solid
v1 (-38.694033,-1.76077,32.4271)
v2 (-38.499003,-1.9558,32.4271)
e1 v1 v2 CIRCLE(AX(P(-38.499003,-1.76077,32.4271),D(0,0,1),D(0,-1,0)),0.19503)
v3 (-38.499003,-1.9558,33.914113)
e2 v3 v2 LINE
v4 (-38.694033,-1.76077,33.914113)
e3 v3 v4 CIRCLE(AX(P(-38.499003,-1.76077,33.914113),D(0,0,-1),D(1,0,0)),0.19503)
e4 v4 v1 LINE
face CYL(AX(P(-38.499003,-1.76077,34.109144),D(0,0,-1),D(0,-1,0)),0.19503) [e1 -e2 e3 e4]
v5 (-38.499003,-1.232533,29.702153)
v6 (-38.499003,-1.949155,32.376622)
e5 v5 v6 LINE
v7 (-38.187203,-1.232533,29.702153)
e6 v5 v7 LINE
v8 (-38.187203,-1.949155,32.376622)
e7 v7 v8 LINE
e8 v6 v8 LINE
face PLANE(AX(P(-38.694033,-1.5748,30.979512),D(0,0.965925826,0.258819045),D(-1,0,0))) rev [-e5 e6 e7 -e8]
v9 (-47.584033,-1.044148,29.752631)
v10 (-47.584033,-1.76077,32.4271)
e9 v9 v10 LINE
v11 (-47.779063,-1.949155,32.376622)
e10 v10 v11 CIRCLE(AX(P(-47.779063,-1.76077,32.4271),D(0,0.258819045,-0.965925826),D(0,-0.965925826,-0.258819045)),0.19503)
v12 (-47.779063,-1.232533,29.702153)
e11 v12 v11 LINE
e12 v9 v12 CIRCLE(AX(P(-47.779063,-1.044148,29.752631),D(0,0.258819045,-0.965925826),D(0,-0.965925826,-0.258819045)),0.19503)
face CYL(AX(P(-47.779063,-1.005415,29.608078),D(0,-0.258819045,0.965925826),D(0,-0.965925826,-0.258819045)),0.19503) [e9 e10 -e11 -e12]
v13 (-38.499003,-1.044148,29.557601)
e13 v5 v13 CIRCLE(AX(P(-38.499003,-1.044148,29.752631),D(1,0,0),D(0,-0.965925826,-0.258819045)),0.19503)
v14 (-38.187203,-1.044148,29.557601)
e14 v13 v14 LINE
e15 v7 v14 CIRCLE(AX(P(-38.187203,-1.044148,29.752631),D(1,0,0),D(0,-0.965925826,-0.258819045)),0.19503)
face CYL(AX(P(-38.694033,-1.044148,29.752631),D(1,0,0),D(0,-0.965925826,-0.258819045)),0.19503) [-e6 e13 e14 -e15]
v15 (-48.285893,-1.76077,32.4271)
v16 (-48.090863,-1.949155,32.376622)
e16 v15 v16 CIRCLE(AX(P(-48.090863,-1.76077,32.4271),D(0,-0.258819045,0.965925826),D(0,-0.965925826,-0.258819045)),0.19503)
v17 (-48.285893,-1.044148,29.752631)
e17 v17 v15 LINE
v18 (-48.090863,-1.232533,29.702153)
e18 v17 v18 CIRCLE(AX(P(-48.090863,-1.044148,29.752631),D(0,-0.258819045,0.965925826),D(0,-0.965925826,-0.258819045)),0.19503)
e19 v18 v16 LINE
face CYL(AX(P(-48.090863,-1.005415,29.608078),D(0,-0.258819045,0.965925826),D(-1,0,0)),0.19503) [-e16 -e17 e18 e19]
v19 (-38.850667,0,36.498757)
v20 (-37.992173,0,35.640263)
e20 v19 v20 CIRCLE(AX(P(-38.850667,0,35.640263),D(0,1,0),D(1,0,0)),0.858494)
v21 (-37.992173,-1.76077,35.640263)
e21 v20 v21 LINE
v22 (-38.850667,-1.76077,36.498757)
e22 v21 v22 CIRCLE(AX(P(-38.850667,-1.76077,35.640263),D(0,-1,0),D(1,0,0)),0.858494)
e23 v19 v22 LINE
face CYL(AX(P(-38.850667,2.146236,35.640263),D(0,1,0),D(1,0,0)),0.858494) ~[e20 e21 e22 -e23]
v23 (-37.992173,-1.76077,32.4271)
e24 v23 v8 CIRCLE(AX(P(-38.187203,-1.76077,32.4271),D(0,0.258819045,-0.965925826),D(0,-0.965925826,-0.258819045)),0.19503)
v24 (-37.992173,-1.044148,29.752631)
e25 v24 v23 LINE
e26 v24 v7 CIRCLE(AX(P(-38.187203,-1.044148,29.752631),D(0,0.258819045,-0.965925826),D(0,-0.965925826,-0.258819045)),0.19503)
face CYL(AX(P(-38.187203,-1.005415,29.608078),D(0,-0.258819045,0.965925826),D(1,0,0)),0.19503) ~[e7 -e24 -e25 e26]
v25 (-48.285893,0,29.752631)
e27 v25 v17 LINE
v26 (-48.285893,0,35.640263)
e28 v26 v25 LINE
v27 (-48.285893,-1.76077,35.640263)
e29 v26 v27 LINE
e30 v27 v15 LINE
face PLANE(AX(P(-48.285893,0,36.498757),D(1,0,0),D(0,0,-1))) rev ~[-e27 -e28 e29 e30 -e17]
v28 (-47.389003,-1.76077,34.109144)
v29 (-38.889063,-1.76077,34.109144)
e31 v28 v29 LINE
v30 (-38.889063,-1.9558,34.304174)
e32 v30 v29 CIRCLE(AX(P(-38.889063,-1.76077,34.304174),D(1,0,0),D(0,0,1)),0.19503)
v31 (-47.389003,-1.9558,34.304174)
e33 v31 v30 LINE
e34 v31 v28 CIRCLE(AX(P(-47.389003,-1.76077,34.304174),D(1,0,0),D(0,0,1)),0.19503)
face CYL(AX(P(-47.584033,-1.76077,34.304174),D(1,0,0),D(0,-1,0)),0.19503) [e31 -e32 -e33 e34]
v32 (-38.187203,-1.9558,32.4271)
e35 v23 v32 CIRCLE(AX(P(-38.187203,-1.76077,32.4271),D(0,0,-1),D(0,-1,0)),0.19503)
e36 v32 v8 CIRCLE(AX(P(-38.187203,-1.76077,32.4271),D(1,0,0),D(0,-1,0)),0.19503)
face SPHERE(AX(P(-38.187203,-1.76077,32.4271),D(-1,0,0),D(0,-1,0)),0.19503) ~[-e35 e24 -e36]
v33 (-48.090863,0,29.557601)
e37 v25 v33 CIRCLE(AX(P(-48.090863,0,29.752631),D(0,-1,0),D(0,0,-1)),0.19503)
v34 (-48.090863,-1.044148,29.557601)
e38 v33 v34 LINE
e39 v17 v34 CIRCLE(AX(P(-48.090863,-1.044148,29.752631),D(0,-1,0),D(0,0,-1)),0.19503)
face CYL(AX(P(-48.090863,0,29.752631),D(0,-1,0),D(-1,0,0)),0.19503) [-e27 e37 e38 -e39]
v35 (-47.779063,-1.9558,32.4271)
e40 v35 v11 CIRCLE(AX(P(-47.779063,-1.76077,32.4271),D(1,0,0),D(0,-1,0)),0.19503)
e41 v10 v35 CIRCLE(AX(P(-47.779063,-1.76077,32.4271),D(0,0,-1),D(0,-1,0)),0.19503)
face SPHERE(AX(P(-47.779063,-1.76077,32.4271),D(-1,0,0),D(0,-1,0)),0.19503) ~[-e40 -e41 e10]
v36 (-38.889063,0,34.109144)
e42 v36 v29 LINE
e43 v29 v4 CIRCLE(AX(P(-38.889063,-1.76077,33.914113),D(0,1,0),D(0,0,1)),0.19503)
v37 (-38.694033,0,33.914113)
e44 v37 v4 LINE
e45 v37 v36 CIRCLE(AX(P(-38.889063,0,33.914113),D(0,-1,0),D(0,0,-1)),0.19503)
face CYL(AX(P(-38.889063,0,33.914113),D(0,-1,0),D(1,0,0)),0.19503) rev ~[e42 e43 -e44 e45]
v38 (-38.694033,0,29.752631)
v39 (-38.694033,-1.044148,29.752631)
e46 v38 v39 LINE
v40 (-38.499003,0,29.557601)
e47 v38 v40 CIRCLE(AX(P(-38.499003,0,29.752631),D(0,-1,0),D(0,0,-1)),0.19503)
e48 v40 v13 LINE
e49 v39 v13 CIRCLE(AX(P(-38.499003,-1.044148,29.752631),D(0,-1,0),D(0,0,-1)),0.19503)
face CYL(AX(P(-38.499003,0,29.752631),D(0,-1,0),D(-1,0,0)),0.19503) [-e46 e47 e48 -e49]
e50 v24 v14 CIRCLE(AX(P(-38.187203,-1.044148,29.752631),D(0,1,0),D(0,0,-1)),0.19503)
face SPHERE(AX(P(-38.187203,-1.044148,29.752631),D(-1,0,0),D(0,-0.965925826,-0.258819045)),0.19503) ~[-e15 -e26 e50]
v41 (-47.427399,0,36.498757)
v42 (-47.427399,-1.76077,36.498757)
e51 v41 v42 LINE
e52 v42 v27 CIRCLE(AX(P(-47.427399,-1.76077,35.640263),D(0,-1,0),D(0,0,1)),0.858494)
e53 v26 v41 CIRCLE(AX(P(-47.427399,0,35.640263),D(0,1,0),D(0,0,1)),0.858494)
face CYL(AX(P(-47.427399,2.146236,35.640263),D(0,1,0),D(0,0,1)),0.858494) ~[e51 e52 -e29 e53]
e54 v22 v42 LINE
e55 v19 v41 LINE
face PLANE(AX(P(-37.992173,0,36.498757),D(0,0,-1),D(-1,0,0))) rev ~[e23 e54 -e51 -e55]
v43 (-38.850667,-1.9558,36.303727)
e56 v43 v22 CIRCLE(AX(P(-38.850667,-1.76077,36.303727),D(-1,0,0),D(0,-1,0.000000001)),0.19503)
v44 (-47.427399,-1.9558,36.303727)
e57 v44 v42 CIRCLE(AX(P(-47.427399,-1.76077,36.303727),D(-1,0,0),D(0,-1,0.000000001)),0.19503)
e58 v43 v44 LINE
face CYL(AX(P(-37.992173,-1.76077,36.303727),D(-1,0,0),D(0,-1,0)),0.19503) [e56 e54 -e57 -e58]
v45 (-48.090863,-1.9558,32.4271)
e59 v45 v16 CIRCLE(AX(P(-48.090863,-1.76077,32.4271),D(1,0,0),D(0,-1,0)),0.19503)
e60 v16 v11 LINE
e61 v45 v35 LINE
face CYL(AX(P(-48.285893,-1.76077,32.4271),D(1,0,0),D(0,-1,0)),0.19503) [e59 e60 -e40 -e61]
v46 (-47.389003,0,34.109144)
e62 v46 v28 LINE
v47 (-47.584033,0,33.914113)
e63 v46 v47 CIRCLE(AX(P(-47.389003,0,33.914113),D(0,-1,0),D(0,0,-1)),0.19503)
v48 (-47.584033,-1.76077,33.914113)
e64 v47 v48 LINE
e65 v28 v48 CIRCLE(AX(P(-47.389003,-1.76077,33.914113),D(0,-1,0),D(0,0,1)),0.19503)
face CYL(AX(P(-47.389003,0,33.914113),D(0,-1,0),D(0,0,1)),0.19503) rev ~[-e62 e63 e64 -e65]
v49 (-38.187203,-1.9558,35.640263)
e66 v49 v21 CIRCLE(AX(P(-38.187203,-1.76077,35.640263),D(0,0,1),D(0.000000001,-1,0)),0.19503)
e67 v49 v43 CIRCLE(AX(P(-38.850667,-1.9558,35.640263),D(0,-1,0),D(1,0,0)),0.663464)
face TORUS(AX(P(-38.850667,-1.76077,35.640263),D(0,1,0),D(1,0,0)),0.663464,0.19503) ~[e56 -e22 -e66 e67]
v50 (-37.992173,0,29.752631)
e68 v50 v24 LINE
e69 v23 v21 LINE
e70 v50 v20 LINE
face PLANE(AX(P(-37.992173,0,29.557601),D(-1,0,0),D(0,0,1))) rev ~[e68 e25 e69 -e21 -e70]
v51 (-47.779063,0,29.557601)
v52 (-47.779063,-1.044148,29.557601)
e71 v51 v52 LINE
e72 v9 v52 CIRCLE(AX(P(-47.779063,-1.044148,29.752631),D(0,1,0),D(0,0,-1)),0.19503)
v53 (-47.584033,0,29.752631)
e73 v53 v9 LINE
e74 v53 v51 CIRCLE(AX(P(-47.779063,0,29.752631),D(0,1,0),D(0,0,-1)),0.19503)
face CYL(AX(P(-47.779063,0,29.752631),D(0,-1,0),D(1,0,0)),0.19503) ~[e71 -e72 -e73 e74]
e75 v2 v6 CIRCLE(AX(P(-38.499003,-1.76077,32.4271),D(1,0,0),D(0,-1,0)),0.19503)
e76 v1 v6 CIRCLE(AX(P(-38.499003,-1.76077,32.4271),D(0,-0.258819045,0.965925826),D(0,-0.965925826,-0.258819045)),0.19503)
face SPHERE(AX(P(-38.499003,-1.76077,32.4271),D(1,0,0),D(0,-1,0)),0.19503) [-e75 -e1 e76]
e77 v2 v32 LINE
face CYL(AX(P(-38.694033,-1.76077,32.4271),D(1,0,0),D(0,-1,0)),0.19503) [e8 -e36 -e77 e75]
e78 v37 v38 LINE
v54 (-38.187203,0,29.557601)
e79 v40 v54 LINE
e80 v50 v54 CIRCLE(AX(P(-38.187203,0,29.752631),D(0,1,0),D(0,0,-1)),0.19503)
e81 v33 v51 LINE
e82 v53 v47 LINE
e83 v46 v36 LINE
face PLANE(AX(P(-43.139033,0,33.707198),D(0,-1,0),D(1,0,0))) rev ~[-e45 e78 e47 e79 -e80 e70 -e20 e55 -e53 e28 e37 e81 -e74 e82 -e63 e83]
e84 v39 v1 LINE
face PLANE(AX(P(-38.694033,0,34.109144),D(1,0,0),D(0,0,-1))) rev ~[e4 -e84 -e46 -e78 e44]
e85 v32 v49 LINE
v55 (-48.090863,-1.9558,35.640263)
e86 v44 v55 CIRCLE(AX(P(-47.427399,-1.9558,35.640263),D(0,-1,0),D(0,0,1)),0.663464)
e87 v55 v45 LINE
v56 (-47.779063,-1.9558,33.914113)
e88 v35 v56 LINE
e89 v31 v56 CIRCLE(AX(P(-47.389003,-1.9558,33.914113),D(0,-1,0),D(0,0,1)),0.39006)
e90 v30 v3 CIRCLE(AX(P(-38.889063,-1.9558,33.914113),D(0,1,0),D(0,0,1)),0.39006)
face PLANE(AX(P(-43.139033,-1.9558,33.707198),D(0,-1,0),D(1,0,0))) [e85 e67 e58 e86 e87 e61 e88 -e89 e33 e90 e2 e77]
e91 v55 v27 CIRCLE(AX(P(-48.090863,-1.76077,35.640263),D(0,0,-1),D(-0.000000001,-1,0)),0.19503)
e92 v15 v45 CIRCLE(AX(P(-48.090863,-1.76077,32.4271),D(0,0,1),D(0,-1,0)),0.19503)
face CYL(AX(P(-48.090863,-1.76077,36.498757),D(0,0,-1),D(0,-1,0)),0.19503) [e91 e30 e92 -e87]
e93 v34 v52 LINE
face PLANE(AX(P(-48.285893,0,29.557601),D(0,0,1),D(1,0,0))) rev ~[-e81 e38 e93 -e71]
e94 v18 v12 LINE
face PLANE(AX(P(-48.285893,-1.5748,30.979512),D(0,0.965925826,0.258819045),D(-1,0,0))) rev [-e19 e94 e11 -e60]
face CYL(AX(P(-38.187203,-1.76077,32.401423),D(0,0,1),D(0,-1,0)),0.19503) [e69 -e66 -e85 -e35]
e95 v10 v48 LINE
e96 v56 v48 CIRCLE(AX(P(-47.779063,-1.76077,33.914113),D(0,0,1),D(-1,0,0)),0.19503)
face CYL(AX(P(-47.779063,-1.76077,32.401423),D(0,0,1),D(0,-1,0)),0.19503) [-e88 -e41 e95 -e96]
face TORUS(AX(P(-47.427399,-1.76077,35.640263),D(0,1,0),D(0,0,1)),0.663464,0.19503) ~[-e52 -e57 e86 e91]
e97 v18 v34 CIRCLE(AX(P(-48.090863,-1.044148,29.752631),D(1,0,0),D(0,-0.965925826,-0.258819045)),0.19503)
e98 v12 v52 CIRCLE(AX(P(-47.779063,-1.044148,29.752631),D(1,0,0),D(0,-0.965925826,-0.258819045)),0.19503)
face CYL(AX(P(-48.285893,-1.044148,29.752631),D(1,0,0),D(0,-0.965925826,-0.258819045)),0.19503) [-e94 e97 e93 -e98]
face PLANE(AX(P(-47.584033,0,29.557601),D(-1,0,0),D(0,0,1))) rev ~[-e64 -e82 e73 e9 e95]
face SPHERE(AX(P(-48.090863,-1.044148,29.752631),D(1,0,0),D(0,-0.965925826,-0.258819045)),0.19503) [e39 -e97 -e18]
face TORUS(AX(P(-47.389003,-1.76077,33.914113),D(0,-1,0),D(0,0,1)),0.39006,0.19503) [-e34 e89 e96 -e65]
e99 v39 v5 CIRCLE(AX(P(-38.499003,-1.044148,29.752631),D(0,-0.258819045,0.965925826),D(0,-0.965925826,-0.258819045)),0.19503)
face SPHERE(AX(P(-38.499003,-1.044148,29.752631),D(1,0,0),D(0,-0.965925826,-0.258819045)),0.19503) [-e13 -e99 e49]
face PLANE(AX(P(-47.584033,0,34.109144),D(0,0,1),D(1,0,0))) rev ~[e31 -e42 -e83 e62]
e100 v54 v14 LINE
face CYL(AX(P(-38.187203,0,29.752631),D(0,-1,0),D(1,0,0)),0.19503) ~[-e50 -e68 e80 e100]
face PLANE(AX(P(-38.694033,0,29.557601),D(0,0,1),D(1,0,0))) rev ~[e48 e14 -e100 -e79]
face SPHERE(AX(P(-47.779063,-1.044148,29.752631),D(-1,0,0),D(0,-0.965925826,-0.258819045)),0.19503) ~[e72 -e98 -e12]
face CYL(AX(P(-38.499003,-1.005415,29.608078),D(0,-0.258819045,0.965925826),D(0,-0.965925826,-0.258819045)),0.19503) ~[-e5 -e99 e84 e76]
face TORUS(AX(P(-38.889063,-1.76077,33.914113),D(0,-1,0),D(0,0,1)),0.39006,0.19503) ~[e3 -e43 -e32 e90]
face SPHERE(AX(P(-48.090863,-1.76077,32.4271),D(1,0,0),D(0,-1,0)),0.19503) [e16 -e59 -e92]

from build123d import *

# Parameters (mm, degrees)
F1_DEPTH    = 1.9558
F2_SIZE2    = 2.8438227154
F2_SIZE     = 0.762
F2_2_SIZE2  = 2.8438227154
F2_2_SIZE   = 0.762
F3_R        = 0.1950302499
F4_T1_DEPTH = 4.1020358569
F4_T4_ANGLE = 90
F4_T6_ANGLE = 90


# Not quite as in the source:
# - a fillet or chamfer that OpenCascade refuses, or shapes differently, is made with other operations: its cross-section is extruded or revolved along the edge and cut away or added


with BuildPart() as f1:
    # F0 (on Front) → F1 (new body)
    with BuildSketch(Plane.XZ):
        Polygon((-37.9921731242, 36.4987568722), (-48.2858929149, 36.4987568722), (-48.2858929149, 34.1091437473), (-48.2858929149, 29.5576006174), (-47.5840330195, 29.5576006174), (-47.5840330195, 34.1091437473), (-43.1390330195, 34.1091437473), (-38.6940330195, 34.1091437473), (-38.6940330195, 29.5576006174), (-37.9921731242, 29.5576006174), (-37.9921731242, 34.1091437473), align=None)
    extrude(amount=F1_DEPTH)

    # F2
    f2_edges = [f1.edges().sort_by_distance(p)[0] for p in [
        (-47.934963, -1.9558, 29.557601),
    ]]
    f2_side = f1.faces().sort_by_distance((-47.934963, -0.9779, 29.557601))[0]
    chamfer(f2_edges, length=F2_SIZE, length2=F2_SIZE2, reference=f2_side)

    # F2#2
    f2_2_edges = [f1.edges().sort_by_distance(p)[0] for p in [
        (-38.343103, -1.9558, 29.557601),
    ]]
    f2_2_side = f1.faces().sort_by_distance((-38.343103, -0.9779, 29.557601))[0]
    chamfer(f2_2_edges, length=F2_2_SIZE, length2=F2_2_SIZE2, reference=f2_2_side)

    # F3
    f3_edges = [f1.edges().sort_by_distance(p)[0] for p in [
        (-47.934963, -1.1938, 29.557601),
        (-38.343103, -1.1938, 29.557601),
        (-37.992173, -1.5748, 30.979512),
        (-38.694033, -1.5748, 30.979512),
        (-38.343103, -1.9558, 32.401423),
        (-43.139033, -1.9558, 34.109144),
        (-47.584033, -1.5748, 30.979512),
        (-48.285893, -1.5748, 30.979512),
        (-47.934963, -1.9558, 32.401423),
        (-47.584033, -1.9558, 33.255284),
        (-38.694033, -1.9558, 33.255284),
        (-37.992173, -1.9558, 34.45009),
        (-38.694033, -0.5969, 29.557601),
        (-37.992173, -0.5969, 29.557601),
        (-38.694033, -0.9779, 34.109144),
        (-47.584033, -0.9779, 34.109144),
        (-47.584033, -0.5969, 29.557601),
        (-48.285893, -0.5969, 29.557601),
        (-48.285893, -1.9558, 34.45009),
        (-43.139033, -1.9558, 36.498757),
    ]]
    fillet(f3_edges, radius=F3_R)

    # F4: fillet of radius 0.8584943428 on 2 edges, made by hand

    # F4_s2 → F4_t1 (cut)
    with BuildSketch(Plane.XZ.offset(-2.1462358569)):
        with BuildLine():
            ThreePointArc((-37.9921731242, 35.6402625294), (-38.2436202956, 36.2473097008), (-38.850667467, 36.4987568722))
            Line((-38.850667467, 36.4987568722), (-37.9921731242, 36.4987568722))
            Line((-37.9921731242, 36.4987568722), (-37.9921731242, 35.6402625294))
        make_face()
        with BuildLine():
            ThreePointArc((-47.4273985721, 36.4987568722), (-48.0344457435, 36.2473097008), (-48.2858929149, 35.6402625294))
            Line((-48.2858929149, 35.6402625294), (-48.2858929149, 36.4987568722))
            Line((-48.2858929149, 36.4987568722), (-47.4273985721, 36.4987568722))
        make_face()
    extrude(amount=F4_T1_DEPTH, mode=Mode.SUBTRACT)

    # F4_s3 → F4_t4 (revolve, cut)
    with BuildSketch(Plane.YZ.offset(-47.4273985721)):
        with BuildLine():
            ThreePointArc((-1.9558, 36.3037266223), (-1.8986769623, 36.4416338345), (-1.7607697501, 36.4987568722))
            Line((-1.7607697501, 36.4987568722), (-1.9558, 36.4987568722))
            Line((-1.9558, 36.4987568722), (-1.9558, 36.3037266223))
        make_face()
    revolve(axis=Axis((-47.4273985721, -1.9558, 35.6402625294), (0, -1, 0)), revolution_arc=F4_T4_ANGLE, mode=Mode.SUBTRACT)

    # F4_s5 → F4_t6 (revolve, cut)
    with BuildSketch(Plane.XY.offset(35.6402625294)):
        with BuildLine():
            ThreePointArc((-38.1872033741, -1.9558), (-38.0492961619, -1.8986769623), (-37.9921731242, -1.7607697501))
            Line((-37.9921731242, -1.7607697501), (-37.9921731242, -1.9558))
            Line((-37.9921731242, -1.9558), (-38.1872033741, -1.9558))
        make_face()
    revolve(axis=Axis((-38.850667467, -1.9558, 35.6402625294), (0, -1, 0)), revolution_arc=F4_T6_ANGLE, mode=Mode.SUBTRACT)


solid = f1.part
